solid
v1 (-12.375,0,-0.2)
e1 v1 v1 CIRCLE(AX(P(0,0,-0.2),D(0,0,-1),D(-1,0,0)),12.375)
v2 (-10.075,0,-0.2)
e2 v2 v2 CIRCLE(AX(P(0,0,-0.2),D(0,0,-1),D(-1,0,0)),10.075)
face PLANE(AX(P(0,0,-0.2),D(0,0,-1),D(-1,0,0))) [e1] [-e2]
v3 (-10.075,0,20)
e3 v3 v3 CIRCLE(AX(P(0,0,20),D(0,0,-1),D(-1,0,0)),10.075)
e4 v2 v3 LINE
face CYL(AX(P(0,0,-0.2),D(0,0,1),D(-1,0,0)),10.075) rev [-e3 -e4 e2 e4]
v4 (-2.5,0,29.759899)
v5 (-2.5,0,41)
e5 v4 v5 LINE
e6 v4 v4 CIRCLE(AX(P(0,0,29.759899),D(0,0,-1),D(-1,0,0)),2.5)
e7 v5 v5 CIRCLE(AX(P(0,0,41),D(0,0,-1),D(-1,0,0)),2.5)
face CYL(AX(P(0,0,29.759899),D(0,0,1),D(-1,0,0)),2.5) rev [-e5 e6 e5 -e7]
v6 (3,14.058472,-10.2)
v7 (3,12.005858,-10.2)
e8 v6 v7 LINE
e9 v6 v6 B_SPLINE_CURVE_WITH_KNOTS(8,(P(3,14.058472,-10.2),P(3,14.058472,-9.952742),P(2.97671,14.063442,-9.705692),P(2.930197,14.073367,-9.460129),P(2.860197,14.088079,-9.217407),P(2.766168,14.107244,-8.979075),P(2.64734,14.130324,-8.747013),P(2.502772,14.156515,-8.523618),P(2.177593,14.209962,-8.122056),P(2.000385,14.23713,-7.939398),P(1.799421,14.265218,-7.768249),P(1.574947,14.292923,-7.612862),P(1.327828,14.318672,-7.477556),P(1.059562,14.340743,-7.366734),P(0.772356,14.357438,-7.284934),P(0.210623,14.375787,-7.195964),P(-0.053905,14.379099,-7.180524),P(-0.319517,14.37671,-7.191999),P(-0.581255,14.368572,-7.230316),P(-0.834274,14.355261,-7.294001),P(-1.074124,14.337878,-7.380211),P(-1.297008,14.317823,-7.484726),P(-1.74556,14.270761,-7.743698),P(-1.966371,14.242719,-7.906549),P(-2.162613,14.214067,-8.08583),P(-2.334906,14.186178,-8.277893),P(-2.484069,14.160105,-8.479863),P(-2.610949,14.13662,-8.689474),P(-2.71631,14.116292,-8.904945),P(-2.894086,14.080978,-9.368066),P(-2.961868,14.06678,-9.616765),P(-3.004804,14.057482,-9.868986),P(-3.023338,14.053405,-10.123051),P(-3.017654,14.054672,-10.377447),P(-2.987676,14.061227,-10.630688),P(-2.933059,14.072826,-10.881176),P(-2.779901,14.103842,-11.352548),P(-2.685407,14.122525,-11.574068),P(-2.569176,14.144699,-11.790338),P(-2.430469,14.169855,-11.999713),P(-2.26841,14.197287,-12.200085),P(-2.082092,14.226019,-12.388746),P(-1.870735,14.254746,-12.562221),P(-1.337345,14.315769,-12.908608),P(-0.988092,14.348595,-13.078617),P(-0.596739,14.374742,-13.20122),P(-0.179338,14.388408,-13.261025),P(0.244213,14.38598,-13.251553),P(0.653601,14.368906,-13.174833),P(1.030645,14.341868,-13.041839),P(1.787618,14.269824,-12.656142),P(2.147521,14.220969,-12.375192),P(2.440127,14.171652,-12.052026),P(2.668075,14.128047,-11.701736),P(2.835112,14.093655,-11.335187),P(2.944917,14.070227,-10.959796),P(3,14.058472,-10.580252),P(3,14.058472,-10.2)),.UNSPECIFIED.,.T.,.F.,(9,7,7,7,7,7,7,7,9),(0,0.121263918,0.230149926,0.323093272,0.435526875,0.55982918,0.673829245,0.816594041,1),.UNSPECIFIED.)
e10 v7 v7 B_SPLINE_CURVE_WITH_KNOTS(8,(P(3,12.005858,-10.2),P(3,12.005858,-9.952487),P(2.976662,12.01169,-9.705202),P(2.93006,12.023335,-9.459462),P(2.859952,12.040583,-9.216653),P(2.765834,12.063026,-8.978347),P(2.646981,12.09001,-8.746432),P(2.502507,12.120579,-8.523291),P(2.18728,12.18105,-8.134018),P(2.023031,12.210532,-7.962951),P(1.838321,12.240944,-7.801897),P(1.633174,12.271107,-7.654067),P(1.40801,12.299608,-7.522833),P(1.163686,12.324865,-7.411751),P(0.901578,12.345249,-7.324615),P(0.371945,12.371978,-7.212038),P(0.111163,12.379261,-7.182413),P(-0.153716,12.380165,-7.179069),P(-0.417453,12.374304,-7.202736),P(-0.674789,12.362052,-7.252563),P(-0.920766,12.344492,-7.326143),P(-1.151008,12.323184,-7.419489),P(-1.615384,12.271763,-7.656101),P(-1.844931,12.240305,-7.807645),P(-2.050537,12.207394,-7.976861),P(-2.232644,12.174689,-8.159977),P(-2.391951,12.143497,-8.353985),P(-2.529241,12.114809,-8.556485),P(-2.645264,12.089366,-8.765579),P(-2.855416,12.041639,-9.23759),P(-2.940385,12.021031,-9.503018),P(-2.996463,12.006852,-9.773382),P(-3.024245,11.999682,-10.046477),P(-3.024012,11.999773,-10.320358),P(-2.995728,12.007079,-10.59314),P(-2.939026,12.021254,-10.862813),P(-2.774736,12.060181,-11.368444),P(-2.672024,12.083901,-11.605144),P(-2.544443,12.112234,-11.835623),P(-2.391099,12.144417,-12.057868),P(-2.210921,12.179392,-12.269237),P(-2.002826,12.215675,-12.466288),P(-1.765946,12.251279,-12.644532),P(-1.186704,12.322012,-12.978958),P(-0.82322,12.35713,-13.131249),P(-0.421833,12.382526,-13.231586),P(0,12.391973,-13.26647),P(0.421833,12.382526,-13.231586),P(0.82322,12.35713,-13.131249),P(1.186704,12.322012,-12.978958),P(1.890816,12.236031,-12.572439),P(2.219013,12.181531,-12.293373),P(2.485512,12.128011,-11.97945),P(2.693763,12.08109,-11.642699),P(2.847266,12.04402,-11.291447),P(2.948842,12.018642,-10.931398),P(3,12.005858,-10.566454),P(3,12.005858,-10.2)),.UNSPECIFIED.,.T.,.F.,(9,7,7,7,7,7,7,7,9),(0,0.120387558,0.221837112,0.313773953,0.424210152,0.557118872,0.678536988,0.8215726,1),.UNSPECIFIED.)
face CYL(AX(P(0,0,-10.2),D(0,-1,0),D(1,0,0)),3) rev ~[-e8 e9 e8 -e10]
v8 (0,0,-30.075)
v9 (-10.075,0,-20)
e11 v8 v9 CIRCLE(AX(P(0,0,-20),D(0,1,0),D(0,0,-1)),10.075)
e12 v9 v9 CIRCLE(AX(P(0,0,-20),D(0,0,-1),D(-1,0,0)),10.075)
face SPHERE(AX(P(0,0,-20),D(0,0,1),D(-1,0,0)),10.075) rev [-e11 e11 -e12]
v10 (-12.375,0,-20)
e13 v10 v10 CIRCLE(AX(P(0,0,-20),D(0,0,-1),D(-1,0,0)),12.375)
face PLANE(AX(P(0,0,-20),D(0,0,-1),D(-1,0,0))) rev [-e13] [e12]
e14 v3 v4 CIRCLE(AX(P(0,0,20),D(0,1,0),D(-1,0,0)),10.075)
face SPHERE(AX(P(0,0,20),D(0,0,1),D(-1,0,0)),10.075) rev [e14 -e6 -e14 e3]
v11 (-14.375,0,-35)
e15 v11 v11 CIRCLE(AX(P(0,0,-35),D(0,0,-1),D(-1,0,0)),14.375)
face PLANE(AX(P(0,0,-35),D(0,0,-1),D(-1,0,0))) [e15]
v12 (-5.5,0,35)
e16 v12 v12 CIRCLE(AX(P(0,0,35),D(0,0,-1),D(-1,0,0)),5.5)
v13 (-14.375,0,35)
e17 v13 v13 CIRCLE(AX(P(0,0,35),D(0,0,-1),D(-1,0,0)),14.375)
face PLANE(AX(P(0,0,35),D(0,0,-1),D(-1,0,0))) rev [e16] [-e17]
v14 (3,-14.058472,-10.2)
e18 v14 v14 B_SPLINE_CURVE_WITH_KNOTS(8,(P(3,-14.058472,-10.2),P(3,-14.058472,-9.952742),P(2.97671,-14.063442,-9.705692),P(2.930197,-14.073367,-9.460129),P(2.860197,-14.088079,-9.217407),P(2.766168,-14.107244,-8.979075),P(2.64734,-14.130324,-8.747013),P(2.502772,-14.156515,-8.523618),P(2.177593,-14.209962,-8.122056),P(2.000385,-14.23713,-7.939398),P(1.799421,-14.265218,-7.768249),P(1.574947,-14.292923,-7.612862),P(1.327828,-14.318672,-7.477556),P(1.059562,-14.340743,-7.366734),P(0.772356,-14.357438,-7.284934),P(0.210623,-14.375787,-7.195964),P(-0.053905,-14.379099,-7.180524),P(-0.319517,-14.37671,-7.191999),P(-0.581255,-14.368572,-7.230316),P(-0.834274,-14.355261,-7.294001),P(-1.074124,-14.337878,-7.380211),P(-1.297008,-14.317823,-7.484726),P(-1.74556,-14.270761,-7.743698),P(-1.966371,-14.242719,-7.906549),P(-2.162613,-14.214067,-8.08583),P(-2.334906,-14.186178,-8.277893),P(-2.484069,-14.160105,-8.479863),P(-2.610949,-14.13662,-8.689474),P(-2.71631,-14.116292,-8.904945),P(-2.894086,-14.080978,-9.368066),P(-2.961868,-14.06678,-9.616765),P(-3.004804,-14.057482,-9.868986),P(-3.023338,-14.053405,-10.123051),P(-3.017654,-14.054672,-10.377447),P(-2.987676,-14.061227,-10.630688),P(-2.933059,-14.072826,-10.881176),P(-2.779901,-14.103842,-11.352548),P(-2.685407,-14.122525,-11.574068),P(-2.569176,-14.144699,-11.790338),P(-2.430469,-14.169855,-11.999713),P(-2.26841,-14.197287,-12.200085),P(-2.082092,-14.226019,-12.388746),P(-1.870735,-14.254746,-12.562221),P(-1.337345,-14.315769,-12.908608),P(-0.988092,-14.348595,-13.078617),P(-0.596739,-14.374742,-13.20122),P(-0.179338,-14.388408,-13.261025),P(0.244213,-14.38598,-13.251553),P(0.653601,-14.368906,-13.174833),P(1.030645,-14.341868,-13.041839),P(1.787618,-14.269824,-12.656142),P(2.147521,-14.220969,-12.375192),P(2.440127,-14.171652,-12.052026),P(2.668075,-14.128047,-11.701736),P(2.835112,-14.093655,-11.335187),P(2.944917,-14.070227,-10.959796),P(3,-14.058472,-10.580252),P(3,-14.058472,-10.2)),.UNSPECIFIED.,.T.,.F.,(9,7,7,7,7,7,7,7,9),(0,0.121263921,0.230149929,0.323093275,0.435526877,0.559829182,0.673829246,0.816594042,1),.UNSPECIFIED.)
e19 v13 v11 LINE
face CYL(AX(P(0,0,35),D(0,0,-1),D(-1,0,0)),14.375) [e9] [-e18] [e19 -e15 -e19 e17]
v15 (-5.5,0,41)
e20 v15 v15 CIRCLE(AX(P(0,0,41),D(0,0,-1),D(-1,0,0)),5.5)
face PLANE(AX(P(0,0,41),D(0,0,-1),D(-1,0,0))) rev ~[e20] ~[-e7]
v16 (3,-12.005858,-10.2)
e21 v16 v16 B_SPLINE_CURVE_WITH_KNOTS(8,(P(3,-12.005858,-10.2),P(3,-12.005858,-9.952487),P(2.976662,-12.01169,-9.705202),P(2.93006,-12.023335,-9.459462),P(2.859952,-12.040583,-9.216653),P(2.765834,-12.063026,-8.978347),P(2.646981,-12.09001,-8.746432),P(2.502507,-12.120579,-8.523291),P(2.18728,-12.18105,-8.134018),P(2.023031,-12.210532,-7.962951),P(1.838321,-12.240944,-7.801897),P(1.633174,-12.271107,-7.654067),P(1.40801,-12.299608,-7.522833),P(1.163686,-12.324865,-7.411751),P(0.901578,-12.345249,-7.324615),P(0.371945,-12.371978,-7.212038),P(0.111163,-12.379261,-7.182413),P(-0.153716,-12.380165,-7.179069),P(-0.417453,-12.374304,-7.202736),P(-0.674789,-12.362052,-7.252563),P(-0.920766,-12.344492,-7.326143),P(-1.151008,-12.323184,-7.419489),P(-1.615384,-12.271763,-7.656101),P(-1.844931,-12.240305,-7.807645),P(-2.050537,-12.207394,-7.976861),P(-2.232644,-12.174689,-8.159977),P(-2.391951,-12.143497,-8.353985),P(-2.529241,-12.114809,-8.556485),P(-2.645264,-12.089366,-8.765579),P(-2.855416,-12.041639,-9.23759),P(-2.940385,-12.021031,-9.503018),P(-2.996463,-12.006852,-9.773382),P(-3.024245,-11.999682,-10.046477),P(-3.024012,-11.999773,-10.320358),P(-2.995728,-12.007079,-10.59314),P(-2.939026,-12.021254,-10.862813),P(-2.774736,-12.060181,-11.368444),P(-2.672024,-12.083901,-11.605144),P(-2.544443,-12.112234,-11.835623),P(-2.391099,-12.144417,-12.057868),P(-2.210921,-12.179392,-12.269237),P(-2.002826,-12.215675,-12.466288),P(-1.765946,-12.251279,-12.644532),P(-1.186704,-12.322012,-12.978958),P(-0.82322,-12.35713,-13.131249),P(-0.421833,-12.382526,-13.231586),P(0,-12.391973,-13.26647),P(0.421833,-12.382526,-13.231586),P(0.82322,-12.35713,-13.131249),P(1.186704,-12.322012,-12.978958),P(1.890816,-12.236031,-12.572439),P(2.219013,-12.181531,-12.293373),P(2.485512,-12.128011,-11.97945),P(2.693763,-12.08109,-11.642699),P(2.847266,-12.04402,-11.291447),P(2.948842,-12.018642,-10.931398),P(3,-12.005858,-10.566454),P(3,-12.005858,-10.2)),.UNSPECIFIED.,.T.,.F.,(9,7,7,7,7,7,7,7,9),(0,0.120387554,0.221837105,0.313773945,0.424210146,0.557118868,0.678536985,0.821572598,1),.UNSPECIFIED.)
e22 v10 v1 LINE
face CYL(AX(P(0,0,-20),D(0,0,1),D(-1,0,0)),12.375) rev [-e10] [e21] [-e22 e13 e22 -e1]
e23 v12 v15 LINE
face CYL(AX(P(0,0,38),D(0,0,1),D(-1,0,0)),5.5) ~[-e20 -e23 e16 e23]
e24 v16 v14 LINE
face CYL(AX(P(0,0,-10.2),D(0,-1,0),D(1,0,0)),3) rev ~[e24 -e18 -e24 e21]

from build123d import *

# Parameters (mm, degrees)
F0_W     = 3
F0_H     = 6
F2_R     = 3
F3_DEPTH = 15


# Not quite as in the source:
# - a feature names something its author has since deleted; it is built from what else it names


with BuildPart() as f1:
    # F0 (on Front) → F1 (revolve)
    with BuildSketch(Plane.XZ):
        with BuildLine():
            Line((-5.5, 35), (-14.375, 35))
            Line((-14.375, 35), (-14.375, -35))
            Line((-14.375, -35), (0, -35))
            Line((0, -35), (0, -30.075))
            ThreePointArc((0, -30.075), (-7.1241008205, -27.1241008205), (-10.075, -20))
            Line((-10.075, -20), (-12.375, -20))
            Line((-12.375, -20), (-12.375, -0.2))
            Line((-12.375, -0.2), (-10.075, -0.2))
            Line((-10.075, -0.2), (-10.075, 20))
            ThreePointArc((-10.075, 20), (-7.9590553774, 26.1773022024), (-2.5, 29.7598988212))
            Line((-2.5, 29.7598988212), (-2.5, 35))
            Line((-2.5, 35), (-5.5, 35))
        make_face()
        with Locations((-4, 38)):
            Rectangle(F0_W, F0_H)
    revolve(axis=Axis((0, 0, 0), (0, 0, -1)))

    # F2 (on Front) → F3 (cut, symmetric)
    with BuildSketch(Plane.XZ):
        with Locations((0, -10.2)):
            Circle(F2_R)
    extrude(amount=F3_DEPTH, both=True, mode=Mode.SUBTRACT)


solid = f1.part
